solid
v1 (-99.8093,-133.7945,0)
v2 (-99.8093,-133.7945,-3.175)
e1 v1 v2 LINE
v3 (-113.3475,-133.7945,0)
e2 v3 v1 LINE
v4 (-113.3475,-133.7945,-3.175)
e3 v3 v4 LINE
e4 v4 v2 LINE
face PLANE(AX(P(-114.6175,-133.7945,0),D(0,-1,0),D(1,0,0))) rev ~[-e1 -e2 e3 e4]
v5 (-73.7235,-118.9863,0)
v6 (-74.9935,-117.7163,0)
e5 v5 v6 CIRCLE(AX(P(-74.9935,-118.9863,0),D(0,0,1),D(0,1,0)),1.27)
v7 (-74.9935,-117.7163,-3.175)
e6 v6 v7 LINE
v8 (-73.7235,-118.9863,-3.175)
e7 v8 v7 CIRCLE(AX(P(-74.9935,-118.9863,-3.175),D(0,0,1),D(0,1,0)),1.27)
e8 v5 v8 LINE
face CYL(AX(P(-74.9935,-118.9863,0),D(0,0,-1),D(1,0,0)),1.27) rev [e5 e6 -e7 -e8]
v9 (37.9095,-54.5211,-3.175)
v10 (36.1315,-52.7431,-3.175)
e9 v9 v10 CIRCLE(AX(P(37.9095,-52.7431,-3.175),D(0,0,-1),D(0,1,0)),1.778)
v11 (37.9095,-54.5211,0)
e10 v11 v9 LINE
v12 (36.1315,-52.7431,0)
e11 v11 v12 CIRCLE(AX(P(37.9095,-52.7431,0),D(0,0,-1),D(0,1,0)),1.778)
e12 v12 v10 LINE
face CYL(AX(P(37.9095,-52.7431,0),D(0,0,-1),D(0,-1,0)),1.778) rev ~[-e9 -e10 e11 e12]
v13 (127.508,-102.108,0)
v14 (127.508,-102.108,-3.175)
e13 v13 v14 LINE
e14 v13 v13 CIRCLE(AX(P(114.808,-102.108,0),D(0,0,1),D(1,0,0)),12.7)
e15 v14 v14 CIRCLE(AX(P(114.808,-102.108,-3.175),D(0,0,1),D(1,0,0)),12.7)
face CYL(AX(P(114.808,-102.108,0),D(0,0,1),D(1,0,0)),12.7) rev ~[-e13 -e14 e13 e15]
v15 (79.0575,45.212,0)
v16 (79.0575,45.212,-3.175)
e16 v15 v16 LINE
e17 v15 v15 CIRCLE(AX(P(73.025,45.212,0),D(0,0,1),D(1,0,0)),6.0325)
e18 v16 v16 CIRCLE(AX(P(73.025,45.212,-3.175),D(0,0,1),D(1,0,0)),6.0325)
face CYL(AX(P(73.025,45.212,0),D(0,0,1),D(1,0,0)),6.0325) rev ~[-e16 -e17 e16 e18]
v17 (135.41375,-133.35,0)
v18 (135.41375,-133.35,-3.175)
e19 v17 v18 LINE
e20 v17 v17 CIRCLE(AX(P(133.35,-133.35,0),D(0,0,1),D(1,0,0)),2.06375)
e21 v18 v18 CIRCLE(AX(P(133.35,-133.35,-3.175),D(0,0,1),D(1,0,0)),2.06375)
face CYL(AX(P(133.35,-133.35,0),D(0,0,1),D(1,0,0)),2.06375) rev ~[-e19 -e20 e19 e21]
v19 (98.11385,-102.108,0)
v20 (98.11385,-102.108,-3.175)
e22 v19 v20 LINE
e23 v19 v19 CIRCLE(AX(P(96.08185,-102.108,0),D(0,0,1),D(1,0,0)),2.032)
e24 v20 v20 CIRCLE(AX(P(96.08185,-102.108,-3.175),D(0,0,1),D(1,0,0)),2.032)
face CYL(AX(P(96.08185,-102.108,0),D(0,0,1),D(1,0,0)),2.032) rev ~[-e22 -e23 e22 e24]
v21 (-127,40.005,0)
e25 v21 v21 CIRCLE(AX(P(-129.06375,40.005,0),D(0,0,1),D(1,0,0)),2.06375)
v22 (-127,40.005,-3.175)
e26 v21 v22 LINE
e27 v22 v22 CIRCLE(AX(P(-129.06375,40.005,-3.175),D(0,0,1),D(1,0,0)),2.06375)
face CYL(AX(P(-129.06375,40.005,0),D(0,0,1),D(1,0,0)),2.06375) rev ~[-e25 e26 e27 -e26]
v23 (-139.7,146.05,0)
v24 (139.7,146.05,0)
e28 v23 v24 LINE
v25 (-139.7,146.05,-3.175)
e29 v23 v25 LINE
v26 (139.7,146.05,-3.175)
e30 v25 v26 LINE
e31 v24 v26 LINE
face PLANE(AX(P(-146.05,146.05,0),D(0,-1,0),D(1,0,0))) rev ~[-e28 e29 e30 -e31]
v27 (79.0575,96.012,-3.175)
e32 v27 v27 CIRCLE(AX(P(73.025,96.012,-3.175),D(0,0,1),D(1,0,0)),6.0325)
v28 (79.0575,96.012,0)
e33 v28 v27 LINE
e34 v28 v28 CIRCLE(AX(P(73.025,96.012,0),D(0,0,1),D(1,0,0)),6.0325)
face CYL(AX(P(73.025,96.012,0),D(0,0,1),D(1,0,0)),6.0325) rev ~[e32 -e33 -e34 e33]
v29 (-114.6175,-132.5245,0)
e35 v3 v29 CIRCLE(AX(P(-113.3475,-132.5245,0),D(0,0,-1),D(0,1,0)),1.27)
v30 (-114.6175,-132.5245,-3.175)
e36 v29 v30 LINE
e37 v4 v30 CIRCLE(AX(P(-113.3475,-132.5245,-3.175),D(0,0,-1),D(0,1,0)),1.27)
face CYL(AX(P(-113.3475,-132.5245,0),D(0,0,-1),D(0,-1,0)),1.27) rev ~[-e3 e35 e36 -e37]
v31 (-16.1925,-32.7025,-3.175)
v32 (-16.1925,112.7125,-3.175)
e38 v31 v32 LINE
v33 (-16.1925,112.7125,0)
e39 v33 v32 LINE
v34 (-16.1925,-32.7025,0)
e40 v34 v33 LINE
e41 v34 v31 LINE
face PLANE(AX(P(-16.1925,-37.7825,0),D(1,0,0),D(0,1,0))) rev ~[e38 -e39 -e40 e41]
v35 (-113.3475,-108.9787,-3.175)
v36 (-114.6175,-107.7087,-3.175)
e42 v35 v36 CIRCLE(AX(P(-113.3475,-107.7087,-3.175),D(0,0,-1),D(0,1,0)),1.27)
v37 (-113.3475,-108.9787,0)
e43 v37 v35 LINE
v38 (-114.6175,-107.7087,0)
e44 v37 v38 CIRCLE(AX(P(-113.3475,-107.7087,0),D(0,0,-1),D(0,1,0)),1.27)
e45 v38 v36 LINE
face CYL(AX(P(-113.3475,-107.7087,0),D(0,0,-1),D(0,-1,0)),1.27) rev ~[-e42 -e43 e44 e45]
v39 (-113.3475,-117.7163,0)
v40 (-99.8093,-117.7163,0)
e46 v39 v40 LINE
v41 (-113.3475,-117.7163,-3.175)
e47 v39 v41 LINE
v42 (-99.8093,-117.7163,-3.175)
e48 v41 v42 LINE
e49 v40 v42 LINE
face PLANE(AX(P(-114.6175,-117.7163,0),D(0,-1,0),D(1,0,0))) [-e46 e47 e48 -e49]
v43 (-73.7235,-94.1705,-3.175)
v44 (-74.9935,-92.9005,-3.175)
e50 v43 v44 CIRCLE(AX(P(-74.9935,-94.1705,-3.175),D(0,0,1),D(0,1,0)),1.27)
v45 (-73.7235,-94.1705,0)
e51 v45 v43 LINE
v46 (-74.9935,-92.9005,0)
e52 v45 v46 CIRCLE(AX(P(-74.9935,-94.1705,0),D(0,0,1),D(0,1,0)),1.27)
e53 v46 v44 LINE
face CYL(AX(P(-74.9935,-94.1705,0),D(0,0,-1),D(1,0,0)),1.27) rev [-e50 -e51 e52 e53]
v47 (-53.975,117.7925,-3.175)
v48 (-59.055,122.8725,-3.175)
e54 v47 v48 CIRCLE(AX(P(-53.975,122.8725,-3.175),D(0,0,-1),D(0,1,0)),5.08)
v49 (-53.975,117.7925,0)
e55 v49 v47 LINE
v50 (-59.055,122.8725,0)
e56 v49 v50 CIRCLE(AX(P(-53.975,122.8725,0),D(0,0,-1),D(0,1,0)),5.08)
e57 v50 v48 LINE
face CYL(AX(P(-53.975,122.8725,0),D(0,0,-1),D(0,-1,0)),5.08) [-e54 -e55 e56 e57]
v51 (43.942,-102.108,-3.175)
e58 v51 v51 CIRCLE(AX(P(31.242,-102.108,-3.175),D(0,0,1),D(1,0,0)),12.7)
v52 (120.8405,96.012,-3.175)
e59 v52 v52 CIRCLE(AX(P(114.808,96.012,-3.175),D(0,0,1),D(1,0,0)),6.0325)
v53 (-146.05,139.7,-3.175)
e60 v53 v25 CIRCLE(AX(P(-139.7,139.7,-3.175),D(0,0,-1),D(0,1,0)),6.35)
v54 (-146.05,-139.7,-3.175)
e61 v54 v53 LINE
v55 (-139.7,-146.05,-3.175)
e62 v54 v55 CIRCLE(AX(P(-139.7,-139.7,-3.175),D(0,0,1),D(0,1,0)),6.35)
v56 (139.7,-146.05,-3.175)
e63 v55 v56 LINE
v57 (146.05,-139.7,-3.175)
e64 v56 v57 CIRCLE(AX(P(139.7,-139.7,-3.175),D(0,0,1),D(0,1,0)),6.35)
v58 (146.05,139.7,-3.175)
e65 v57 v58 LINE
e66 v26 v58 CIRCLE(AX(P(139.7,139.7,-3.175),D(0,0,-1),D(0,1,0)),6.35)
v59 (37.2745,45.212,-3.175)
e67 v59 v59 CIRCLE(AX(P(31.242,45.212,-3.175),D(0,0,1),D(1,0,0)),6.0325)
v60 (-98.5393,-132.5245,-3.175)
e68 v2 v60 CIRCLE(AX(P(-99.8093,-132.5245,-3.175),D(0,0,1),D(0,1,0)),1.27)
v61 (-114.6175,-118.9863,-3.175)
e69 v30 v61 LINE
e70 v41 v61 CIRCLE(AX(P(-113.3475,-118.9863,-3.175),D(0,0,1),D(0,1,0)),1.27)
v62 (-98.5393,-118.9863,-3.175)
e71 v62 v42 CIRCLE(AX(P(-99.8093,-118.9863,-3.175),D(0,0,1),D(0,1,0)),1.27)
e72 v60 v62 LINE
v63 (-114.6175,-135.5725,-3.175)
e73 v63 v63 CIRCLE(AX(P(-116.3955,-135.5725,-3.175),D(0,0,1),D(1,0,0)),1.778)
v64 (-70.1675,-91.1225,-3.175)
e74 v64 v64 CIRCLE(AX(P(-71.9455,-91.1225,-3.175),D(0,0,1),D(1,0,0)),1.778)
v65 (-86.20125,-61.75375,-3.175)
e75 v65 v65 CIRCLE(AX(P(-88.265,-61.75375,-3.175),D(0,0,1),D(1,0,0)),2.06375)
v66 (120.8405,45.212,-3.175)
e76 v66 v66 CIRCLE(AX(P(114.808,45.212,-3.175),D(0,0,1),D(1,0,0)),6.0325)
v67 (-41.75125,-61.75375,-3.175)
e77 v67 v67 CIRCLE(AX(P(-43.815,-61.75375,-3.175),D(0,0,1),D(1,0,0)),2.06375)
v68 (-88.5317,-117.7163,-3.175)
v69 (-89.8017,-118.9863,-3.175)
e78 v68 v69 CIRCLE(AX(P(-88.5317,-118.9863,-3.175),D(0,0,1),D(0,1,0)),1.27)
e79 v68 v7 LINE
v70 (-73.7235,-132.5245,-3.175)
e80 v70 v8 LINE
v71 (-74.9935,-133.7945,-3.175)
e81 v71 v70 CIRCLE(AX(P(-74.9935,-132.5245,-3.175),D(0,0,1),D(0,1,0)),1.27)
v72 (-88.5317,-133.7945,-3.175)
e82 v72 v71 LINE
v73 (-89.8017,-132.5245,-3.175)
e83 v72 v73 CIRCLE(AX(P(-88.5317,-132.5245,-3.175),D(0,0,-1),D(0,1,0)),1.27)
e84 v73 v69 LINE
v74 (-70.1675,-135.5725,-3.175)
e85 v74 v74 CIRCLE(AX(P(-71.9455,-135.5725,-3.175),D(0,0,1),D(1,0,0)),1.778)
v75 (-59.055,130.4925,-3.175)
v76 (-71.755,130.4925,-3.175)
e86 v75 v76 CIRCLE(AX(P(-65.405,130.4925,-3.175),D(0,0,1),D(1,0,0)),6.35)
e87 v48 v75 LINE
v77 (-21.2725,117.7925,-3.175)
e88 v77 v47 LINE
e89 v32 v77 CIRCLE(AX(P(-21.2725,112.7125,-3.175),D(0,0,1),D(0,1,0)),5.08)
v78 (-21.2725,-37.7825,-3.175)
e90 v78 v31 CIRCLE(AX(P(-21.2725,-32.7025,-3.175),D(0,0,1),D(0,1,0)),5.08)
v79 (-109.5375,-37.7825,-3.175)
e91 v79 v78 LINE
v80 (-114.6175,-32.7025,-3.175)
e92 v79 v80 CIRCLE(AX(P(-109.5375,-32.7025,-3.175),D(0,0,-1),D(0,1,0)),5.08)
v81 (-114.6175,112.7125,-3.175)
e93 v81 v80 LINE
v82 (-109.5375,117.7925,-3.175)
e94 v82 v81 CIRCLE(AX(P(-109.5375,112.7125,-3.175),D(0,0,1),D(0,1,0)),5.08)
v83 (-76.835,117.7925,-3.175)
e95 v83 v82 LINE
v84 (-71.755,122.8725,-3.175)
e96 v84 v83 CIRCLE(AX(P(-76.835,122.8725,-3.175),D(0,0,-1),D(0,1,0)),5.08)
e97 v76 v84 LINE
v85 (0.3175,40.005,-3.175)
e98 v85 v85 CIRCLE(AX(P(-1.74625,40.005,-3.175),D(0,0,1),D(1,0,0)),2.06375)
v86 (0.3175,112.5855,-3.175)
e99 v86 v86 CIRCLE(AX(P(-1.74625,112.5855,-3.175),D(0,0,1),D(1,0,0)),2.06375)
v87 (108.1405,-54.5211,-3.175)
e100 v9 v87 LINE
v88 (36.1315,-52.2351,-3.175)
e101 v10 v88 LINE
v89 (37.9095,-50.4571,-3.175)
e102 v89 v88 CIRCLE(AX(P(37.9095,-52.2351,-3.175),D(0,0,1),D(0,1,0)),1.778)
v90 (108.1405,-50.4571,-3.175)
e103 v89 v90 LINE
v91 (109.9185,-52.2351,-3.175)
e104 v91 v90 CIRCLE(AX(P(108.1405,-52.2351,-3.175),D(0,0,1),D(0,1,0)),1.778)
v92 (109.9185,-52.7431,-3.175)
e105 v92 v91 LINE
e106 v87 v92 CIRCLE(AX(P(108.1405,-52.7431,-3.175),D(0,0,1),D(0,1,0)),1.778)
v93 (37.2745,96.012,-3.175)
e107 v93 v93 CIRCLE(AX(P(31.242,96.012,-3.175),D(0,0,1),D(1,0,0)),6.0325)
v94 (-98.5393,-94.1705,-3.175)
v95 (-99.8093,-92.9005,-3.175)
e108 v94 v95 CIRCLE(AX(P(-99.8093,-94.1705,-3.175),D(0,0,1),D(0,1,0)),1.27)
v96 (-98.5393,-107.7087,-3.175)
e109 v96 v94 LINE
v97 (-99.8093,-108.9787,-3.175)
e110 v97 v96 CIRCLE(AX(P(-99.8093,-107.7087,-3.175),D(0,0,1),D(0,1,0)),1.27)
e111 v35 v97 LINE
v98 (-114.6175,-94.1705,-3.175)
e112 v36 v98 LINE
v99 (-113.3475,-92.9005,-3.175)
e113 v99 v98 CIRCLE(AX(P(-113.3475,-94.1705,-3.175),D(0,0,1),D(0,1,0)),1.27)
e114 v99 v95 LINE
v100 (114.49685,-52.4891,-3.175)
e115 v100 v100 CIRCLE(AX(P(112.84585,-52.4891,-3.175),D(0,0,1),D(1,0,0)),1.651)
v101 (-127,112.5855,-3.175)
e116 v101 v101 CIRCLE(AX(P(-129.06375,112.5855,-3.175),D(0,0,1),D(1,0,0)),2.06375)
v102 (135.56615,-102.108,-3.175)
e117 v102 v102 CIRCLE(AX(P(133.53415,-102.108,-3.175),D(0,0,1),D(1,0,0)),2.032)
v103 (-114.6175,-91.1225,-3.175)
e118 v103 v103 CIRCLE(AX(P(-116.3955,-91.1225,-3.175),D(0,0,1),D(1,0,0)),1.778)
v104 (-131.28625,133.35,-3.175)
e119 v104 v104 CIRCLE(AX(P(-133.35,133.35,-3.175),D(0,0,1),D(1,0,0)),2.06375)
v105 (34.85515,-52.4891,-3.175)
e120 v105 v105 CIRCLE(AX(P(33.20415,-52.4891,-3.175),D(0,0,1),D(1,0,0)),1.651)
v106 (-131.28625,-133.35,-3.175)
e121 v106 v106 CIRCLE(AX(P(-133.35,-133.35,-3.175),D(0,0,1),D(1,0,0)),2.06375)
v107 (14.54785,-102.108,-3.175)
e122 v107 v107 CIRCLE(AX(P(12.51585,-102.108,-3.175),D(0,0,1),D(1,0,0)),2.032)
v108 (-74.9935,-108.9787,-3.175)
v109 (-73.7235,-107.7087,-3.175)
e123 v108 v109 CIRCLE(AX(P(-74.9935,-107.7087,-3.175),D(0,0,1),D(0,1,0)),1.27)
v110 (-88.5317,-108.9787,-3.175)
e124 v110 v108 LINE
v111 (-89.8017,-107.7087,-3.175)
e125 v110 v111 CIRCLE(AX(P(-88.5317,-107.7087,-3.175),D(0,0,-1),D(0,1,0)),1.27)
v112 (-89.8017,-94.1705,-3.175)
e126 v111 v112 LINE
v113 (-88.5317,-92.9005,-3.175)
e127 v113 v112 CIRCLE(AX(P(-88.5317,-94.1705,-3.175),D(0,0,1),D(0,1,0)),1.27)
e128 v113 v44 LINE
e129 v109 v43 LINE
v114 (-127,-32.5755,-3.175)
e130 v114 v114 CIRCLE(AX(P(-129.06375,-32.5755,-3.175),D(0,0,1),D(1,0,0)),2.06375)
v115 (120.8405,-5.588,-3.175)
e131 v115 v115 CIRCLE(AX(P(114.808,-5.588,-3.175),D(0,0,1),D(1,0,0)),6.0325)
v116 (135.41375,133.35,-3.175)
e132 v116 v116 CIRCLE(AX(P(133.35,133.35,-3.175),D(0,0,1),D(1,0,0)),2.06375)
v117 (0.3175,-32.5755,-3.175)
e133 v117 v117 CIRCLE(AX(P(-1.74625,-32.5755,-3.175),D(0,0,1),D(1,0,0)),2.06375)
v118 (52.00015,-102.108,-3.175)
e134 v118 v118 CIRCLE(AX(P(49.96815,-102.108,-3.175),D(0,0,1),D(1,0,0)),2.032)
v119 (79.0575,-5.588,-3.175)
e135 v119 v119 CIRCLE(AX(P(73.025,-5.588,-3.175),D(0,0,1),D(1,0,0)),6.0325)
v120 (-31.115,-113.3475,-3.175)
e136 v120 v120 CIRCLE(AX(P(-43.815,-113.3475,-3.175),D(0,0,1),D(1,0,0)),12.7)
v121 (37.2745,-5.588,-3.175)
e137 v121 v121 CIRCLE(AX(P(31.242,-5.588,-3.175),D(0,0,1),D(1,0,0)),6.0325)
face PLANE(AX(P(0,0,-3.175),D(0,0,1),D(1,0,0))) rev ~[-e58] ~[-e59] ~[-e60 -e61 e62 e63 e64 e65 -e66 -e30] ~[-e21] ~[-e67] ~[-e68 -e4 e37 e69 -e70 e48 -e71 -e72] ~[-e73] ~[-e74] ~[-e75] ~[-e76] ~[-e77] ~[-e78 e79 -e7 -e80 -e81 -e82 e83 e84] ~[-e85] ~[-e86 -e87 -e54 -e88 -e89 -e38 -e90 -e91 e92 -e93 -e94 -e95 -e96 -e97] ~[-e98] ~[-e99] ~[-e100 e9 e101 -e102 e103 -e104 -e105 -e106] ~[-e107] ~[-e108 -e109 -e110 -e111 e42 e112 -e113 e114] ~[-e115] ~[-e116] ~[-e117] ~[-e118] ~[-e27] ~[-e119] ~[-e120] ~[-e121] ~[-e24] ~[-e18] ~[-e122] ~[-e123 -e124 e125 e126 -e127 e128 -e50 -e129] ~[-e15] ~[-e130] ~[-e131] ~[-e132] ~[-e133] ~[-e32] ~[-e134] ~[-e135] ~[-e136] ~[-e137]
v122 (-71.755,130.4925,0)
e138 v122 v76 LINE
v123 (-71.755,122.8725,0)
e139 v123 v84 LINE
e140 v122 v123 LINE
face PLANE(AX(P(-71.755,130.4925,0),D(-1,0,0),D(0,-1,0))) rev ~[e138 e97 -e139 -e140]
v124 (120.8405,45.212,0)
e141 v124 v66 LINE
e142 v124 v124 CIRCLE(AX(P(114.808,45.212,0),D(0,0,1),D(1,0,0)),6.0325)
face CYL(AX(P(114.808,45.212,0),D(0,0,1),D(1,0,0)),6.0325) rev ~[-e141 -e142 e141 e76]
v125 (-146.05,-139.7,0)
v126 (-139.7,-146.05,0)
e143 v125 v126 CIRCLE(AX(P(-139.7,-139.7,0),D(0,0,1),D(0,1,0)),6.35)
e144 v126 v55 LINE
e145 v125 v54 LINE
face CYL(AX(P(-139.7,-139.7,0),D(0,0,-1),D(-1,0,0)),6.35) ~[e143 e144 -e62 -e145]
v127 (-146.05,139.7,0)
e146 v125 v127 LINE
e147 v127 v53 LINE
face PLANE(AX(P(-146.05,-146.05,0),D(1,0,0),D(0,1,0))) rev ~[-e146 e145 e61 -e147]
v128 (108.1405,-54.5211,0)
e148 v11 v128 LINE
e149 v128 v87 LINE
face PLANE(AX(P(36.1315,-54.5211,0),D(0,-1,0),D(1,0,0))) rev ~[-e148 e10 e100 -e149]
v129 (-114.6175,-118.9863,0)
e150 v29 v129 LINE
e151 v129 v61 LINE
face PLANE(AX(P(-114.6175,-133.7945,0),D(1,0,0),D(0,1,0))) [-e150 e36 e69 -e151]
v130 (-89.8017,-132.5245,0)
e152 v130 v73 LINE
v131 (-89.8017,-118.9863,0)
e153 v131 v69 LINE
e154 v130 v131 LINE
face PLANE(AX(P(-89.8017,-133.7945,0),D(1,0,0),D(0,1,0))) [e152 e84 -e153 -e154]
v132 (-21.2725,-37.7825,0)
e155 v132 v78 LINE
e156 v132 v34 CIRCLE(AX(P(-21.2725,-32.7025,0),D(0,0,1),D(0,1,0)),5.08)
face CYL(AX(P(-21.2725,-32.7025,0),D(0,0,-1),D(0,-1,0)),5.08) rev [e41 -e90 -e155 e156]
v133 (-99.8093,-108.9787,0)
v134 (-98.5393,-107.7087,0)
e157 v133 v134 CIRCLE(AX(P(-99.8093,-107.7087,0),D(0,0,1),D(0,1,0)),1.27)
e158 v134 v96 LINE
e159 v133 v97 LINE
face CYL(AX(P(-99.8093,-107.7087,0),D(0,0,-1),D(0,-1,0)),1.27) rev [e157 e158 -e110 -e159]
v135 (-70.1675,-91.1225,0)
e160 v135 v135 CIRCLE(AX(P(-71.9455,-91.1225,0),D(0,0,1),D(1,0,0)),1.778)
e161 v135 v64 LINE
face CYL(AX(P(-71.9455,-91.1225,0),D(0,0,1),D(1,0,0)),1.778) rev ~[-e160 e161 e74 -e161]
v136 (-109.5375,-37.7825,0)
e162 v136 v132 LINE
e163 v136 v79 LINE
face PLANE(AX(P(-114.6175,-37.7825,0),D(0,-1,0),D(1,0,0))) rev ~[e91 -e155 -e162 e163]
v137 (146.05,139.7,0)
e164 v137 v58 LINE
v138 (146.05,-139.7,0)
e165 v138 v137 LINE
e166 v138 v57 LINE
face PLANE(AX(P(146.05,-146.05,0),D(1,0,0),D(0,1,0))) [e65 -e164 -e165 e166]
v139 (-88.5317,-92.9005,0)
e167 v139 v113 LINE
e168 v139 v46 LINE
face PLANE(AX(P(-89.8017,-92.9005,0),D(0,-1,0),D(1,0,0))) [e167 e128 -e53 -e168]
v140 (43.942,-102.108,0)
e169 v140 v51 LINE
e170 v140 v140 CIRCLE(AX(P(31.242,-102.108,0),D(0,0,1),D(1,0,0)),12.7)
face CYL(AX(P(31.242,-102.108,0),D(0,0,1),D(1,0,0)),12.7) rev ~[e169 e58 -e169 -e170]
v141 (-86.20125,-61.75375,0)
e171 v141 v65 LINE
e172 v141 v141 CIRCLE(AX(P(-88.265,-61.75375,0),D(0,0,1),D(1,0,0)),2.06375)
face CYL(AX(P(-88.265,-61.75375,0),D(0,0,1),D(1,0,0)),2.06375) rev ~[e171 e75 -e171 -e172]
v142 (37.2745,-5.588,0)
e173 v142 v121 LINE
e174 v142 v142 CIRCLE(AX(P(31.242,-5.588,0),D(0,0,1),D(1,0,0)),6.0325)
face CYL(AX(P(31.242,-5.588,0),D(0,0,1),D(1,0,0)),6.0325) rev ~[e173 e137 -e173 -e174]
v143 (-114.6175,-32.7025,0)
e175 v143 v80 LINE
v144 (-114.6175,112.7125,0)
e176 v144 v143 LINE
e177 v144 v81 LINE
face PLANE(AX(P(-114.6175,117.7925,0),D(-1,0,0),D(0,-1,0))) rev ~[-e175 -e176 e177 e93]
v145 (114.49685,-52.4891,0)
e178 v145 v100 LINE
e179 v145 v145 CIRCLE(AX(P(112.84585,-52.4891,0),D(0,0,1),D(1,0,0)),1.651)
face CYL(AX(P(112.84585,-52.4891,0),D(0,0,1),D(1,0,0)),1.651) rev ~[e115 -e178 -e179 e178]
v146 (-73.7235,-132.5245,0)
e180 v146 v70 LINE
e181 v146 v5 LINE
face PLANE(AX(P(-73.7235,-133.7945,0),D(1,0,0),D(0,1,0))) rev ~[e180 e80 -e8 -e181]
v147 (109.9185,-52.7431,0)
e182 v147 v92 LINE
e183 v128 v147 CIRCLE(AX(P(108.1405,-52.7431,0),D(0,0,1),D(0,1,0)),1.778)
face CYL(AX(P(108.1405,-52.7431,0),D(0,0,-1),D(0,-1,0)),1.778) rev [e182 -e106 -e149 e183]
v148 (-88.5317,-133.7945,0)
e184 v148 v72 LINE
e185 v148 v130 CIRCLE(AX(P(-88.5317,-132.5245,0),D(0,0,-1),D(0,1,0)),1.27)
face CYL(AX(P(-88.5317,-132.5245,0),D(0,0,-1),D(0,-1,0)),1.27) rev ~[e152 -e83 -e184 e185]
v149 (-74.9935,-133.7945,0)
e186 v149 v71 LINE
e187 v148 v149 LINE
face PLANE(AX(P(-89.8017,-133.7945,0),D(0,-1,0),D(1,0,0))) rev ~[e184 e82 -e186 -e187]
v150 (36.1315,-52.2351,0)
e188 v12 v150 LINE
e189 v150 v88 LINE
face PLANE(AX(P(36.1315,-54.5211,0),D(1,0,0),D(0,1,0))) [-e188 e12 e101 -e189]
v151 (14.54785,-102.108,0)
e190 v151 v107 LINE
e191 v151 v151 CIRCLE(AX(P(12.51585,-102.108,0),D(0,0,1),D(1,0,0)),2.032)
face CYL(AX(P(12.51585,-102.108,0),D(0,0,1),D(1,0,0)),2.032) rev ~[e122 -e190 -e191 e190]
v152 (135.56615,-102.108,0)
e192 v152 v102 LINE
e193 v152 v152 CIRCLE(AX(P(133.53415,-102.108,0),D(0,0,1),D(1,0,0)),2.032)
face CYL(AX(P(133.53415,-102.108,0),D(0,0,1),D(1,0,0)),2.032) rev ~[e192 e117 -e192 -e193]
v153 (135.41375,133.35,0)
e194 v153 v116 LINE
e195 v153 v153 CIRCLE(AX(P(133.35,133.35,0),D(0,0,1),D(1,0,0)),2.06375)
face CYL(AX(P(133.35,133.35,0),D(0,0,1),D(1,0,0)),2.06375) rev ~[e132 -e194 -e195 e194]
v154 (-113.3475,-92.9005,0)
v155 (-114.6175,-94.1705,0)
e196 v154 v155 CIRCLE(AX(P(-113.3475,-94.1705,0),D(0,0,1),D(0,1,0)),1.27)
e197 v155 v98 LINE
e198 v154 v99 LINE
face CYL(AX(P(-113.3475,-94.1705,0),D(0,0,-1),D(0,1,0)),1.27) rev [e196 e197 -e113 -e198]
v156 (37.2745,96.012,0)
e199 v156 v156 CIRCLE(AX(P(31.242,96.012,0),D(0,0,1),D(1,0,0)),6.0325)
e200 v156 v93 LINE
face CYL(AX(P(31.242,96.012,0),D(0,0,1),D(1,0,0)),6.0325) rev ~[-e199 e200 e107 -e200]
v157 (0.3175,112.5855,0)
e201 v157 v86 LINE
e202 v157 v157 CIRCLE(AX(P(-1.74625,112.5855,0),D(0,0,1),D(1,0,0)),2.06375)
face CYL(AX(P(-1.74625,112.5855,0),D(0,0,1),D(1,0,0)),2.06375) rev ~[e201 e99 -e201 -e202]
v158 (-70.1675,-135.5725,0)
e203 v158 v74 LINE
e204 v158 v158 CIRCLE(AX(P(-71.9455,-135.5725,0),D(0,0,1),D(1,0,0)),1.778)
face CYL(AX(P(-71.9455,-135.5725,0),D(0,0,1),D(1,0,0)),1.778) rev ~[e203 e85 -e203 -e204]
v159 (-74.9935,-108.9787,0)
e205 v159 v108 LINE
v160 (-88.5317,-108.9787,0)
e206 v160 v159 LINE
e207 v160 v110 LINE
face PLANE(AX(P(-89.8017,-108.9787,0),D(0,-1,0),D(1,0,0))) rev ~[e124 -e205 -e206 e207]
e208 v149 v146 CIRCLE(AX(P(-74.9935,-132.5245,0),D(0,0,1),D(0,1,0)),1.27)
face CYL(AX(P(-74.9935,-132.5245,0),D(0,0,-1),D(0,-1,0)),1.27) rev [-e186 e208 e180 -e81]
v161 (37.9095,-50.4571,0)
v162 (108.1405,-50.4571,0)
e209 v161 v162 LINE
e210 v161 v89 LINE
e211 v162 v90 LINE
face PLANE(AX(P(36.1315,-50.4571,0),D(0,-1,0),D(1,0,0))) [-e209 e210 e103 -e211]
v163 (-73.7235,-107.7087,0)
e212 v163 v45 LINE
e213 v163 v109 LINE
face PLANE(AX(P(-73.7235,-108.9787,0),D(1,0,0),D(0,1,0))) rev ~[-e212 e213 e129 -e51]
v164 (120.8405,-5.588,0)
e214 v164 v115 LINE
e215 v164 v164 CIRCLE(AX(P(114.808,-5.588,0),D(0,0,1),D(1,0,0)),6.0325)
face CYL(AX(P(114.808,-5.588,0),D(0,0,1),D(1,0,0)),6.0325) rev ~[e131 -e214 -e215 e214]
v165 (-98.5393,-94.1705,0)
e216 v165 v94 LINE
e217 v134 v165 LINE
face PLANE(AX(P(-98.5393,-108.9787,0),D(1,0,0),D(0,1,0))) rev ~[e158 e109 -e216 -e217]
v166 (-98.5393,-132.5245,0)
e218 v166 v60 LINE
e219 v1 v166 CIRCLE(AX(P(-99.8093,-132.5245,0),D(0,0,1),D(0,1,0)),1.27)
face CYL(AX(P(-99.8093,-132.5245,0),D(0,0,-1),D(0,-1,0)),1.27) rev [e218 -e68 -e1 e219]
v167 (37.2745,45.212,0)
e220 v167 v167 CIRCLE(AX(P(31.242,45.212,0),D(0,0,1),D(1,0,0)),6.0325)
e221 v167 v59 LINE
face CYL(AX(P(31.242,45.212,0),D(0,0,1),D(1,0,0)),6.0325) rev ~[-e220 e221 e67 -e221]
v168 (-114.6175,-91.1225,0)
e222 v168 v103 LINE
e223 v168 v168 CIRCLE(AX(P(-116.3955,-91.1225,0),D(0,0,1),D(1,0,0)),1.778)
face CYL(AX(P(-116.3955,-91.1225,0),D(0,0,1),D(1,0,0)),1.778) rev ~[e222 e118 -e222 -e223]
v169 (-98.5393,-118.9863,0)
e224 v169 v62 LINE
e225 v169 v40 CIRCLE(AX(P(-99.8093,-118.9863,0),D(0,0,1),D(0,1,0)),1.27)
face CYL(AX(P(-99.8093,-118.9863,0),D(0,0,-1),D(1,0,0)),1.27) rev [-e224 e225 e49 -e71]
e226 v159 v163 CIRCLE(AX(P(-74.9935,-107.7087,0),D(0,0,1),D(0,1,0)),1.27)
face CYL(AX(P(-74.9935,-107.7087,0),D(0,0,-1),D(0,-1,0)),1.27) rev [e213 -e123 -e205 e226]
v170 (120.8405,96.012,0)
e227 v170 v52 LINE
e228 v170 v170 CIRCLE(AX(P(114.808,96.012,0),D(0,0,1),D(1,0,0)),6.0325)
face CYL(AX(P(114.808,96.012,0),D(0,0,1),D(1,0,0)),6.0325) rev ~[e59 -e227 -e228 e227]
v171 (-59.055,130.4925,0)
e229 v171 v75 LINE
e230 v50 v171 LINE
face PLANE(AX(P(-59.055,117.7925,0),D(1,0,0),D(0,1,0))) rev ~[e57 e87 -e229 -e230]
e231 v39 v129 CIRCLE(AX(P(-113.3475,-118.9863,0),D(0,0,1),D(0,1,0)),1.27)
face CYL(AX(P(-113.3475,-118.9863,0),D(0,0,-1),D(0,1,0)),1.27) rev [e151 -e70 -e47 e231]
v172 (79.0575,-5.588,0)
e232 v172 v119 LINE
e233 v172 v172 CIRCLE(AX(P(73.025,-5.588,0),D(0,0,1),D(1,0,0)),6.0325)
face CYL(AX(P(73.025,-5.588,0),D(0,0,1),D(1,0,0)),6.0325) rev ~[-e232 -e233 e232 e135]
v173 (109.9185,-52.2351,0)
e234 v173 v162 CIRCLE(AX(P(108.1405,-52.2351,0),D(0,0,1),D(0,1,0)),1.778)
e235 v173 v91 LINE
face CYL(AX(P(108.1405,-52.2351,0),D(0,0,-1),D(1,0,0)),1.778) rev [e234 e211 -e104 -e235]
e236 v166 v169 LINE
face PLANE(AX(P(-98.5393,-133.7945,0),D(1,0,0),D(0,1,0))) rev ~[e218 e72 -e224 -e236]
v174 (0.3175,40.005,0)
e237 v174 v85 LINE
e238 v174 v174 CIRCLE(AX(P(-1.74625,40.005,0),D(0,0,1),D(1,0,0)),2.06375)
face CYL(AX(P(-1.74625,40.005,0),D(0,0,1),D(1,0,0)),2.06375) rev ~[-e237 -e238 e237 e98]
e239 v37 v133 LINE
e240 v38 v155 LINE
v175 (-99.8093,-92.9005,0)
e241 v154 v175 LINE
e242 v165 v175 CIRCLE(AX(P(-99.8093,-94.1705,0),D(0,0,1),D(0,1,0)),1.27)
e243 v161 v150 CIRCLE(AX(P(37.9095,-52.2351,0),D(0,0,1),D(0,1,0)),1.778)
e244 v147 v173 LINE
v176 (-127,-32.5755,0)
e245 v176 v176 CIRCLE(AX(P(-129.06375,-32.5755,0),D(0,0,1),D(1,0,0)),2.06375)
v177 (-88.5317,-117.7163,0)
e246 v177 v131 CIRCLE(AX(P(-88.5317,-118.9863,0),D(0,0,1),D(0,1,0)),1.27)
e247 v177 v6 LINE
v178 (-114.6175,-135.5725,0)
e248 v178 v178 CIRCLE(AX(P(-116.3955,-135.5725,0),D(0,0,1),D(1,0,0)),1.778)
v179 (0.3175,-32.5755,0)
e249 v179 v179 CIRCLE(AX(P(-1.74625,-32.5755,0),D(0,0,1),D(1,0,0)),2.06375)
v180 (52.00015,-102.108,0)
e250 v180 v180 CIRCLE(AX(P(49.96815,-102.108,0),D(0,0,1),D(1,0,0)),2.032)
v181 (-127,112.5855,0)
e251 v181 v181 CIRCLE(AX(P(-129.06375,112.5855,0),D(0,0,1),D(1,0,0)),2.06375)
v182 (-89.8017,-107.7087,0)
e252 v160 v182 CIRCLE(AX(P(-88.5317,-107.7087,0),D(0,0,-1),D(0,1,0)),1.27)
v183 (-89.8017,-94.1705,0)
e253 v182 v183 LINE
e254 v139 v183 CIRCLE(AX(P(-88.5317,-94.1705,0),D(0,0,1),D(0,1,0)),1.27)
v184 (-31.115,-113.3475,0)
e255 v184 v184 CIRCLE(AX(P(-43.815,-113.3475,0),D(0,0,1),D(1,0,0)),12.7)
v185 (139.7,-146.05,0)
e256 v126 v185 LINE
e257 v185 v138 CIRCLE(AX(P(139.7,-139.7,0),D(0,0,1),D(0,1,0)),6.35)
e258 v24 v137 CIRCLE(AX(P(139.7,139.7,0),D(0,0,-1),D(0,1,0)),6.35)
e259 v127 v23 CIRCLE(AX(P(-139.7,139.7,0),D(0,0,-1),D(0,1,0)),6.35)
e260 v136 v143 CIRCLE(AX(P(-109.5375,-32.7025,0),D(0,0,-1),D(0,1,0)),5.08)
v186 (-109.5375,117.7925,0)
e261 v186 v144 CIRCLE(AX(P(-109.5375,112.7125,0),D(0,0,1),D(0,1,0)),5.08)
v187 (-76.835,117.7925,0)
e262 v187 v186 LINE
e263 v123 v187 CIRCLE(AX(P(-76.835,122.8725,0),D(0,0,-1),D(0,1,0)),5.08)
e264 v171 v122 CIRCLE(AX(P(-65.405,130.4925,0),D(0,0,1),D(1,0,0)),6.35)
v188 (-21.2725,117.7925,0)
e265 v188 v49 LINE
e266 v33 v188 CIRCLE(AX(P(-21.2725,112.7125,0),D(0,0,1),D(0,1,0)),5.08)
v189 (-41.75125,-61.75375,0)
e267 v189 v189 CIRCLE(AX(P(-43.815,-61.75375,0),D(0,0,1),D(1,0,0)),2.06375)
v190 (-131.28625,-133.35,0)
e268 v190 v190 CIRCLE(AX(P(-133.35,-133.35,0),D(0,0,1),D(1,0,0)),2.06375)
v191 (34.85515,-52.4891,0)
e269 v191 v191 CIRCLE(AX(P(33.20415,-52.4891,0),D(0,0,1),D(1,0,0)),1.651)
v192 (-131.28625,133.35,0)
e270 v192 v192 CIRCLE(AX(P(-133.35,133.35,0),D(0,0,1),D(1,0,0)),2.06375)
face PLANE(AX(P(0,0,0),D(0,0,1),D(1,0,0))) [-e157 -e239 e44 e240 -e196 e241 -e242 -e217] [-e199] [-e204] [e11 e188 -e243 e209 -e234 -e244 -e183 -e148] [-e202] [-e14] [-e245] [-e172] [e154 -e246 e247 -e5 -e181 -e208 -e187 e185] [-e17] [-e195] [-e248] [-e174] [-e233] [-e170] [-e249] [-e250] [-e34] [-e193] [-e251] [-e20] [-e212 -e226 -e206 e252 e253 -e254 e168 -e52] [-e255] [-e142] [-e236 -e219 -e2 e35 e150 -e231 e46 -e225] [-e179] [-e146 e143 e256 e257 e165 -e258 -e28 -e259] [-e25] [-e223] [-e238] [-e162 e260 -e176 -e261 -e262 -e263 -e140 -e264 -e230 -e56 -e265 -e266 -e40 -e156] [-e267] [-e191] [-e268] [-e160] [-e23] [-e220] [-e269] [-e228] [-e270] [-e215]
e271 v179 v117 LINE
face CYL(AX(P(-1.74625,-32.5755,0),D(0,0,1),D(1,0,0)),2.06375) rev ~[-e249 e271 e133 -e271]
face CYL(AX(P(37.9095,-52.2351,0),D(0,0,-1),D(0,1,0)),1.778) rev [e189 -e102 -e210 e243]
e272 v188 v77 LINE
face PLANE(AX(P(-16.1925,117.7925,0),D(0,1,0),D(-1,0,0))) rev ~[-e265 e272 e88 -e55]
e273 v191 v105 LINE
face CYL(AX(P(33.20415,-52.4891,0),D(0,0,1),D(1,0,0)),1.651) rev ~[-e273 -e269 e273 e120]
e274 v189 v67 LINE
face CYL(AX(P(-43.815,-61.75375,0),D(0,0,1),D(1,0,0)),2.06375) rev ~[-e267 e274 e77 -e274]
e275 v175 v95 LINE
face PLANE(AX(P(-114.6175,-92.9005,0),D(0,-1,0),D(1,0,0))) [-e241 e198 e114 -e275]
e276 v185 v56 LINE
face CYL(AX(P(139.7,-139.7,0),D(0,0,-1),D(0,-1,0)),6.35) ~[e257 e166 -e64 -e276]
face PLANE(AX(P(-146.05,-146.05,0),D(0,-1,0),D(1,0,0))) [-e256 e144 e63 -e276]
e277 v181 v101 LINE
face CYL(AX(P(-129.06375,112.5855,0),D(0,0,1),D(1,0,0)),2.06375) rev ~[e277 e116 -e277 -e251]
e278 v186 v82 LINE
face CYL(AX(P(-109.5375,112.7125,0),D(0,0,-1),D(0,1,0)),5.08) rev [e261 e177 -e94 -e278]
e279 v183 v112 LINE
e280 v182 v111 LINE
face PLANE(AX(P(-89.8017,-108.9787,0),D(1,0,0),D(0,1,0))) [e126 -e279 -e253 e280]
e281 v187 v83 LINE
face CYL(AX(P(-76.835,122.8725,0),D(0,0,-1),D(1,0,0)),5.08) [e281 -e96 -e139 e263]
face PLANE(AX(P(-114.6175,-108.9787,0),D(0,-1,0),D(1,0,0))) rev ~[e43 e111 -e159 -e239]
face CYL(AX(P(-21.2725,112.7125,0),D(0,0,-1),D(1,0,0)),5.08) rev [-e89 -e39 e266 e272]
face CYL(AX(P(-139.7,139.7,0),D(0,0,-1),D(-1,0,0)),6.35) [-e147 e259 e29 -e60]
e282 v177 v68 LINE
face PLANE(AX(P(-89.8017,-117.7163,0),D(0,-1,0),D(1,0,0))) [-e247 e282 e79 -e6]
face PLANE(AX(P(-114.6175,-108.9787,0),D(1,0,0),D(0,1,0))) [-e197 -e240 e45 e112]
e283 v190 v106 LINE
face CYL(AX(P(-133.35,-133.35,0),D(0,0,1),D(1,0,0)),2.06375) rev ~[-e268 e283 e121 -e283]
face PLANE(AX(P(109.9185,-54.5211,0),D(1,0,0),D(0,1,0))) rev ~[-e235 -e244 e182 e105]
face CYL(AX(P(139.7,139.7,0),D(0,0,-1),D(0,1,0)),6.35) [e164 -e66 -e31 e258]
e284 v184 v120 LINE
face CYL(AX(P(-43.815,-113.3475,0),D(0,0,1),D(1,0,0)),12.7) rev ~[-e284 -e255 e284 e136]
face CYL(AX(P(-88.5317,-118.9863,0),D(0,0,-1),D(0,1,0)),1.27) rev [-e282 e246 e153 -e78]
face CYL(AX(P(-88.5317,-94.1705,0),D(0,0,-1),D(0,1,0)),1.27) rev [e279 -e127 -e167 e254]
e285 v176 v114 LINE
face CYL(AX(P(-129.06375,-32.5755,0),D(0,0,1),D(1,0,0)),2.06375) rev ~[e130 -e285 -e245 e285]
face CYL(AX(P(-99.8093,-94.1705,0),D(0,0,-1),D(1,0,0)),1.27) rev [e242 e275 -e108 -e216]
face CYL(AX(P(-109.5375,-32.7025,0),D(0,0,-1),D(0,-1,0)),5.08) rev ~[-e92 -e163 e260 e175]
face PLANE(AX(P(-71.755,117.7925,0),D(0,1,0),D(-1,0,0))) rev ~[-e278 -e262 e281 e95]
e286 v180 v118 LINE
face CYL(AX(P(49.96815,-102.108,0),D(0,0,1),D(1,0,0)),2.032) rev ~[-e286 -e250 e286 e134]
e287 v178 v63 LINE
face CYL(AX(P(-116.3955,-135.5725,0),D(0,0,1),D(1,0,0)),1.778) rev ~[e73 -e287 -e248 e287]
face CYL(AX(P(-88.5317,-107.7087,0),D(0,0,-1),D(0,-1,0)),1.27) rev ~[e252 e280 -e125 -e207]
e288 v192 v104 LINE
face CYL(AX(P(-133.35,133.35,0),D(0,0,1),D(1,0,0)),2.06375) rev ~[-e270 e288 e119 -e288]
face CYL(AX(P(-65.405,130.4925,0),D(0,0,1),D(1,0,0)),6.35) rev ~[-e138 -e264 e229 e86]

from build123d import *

# Parameters (mm, degrees)
F0_W     = 292.1
F0_H     = 292.1
F0_R     = 2.06375
F1_DEPTH = 3.175
F2_R     = 1.778
F2_W     = 16.0782
F2_H     = 16.0782
F2_R_2   = 2.06375
F2_R_3   = 12.7
F2_R_4   = 6.0325
F2_R_5   = 2.032
F2_R_6   = 1.651
F2_W_2   = 73.787
F2_H_2   = 4.064
F3_DEPTH = 3.176
F4_R     = 5.08
F5_R     = 1.27
F6_R     = 6.35
F7_R     = 1.778


with BuildPart() as f1:
    # F0 (on Top) → F1 (new body)
    with BuildSketch(Plane.XY):
        Rectangle(F0_W, F0_H)
        with Locations((-133.35, -133.35)):
            Circle(F0_R, mode=Mode.SUBTRACT)
        with Locations((133.35, -133.35)):
            Circle(F0_R, mode=Mode.SUBTRACT)
        with Locations((-133.35, 133.35)):
            Circle(F0_R, mode=Mode.SUBTRACT)
        with Locations((133.35, 133.35)):
            Circle(F0_R, mode=Mode.SUBTRACT)
    extrude(amount=-F1_DEPTH)

    # F2 (on face) → F3 (cut, through all)
    with BuildSketch(Plane.XY):
        with BuildLine():
            Line((-114.6175, -37.7825), (-16.1925, -37.7825))
            Line((-16.1925, -37.7825), (-16.1925, 117.7925))
            Line((-16.1925, 117.7925), (-59.055, 117.7925))
            Line((-59.055, 117.7925), (-59.055, 130.4925))
            ThreePointArc((-59.055, 130.4925), (-65.405, 136.8425), (-71.755, 130.4925))
            Line((-71.755, 130.4925), (-71.755, 117.7925))
            Line((-71.755, 117.7925), (-114.6175, 117.7925))
            Line((-114.6175, 117.7925), (-114.6175, -37.7825))
        make_face()
        with Locations((-116.3955, -91.1225)):
            Circle(F2_R)
        with Locations((-71.9455, -91.1225)):
            Circle(F2_R)
        with Locations((-71.9455, -135.5725)):
            Circle(F2_R)
        with Locations((-116.3955, -135.5725)):
            Circle(F2_R)
        with Locations((-106.5784, -100.9396)):
            Rectangle(F2_W, F2_H)
        with Locations((-81.7626, -100.9396)):
            Rectangle(F2_W, F2_H)
        with Locations((-106.5784, -125.7554)):
            Rectangle(F2_W, F2_H)
        with Locations((-81.7626, -125.7554)):
            Rectangle(F2_W, F2_H)
        with Locations((-129.06375, -32.5755)):
            Circle(F2_R_2)
        with Locations((-1.74625, -32.5755)):
            Circle(F2_R_2)
        with Locations((31.242, -102.108)):
            Circle(F2_R_3)
        with Locations((114.808, -102.108)):
            Circle(F2_R_3)
        with Locations((31.242, 96.012)):
            Circle(F2_R_4)
        with Locations((31.242, 45.212)):
            Circle(F2_R_4)
        with Locations((31.242, -5.588)):
            Circle(F2_R_4)
        with Locations((73.025, 96.012)):
            Circle(F2_R_4)
        with Locations((73.025, 45.212)):
            Circle(F2_R_4)
        with Locations((73.025, -5.588)):
            Circle(F2_R_4)
        with Locations((114.808, 96.012)):
            Circle(F2_R_4)
        with Locations((114.808, 45.212)):
            Circle(F2_R_4)
        with Locations((114.808, -5.588)):
            Circle(F2_R_4)
        with Locations((-43.815, -113.3475)):
            Circle(F2_R_3)
        with Locations((12.51585, -102.108)):
            Circle(F2_R_5)
        with Locations((49.96815, -102.108)):
            Circle(F2_R_5)
        with Locations((96.08185, -102.108)):
            Circle(F2_R_5)
        with Locations((133.53415, -102.108)):
            Circle(F2_R_5)
        with Locations((-129.06375, 112.5855)):
            Circle(F2_R_2)
        with Locations((-1.74625, 112.5855)):
            Circle(F2_R_2)
        with Locations((-129.06375, 40.005)):
            Circle(F2_R_2)
        with Locations((-1.74625, 40.005)):
            Circle(F2_R_2)
        with Locations((33.20415, -52.4891)):
            Circle(F2_R_6)
        with Locations((112.84585, -52.4891)):
            Circle(F2_R_6)
        with Locations((-88.265, -61.75375)):
            Circle(F2_R_2)
        with Locations((-43.815, -61.75375)):
            Circle(F2_R_2)
        with Locations((73.025, -52.4891)):
            Rectangle(F2_W_2, F2_H_2)
    extrude(amount=-F3_DEPTH, mode=Mode.SUBTRACT)

    # F4
    f4_edges = [f1.edges().sort_by_distance(p)[0] for p in [
        (-114.6175, 117.7925, -1.5875),
        (-16.1925, 117.7925, -1.5875),
        (-16.1925, -37.7825, -1.5875),
        (-114.6175, -37.7825, -1.5875),
        (-59.055, 117.7925, -1.5875),
        (-71.755, 117.7925, -1.5875),
    ]]
    fillet(f4_edges, radius=F4_R)

    # F5
    f5_edges = [f1.edges().sort_by_distance(p)[0] for p in [
        (-114.6175, -92.9005, -1.5875),
        (-89.8017, -92.9005, -1.5875),
        (-89.8017, -117.7163, -1.5875),
        (-114.6175, -117.7163, -1.5875),
        (-98.5393, -92.9005, -1.5875),
        (-73.7235, -92.9005, -1.5875),
        (-98.5393, -117.7163, -1.5875),
        (-73.7235, -117.7163, -1.5875),
        (-73.7235, -133.7945, -1.5875),
        (-73.7235, -108.9787, -1.5875),
        (-98.5393, -108.9787, -1.5875),
        (-98.5393, -133.7945, -1.5875),
        (-114.6175, -133.7945, -1.5875),
        (-114.6175, -108.9787, -1.5875),
        (-89.8017, -108.9787, -1.5875),
        (-89.8017, -133.7945, -1.5875),
    ]]
    fillet(f5_edges, radius=F5_R)

    # F6
    f6_edges = [f1.edges().sort_by_distance(p)[0] for p in [
        (-146.05, 146.05, -1.5875),
        (146.05, 146.05, -1.5875),
        (146.05, -146.05, -1.5875),
        (-146.05, -146.05, -1.5875),
    ]]
    fillet(f6_edges, radius=F6_R)

    # F7
    f7_edges = [f1.edges().sort_by_distance(p)[0] for p in [
        (36.1315, -50.4571, -1.5875),
        (109.9185, -50.4571, -1.5875),
        (109.9185, -54.5211, -1.5875),
        (36.1315, -54.5211, -1.5875),
    ]]
    fillet(f7_edges, radius=F7_R)


solid = f1.part
